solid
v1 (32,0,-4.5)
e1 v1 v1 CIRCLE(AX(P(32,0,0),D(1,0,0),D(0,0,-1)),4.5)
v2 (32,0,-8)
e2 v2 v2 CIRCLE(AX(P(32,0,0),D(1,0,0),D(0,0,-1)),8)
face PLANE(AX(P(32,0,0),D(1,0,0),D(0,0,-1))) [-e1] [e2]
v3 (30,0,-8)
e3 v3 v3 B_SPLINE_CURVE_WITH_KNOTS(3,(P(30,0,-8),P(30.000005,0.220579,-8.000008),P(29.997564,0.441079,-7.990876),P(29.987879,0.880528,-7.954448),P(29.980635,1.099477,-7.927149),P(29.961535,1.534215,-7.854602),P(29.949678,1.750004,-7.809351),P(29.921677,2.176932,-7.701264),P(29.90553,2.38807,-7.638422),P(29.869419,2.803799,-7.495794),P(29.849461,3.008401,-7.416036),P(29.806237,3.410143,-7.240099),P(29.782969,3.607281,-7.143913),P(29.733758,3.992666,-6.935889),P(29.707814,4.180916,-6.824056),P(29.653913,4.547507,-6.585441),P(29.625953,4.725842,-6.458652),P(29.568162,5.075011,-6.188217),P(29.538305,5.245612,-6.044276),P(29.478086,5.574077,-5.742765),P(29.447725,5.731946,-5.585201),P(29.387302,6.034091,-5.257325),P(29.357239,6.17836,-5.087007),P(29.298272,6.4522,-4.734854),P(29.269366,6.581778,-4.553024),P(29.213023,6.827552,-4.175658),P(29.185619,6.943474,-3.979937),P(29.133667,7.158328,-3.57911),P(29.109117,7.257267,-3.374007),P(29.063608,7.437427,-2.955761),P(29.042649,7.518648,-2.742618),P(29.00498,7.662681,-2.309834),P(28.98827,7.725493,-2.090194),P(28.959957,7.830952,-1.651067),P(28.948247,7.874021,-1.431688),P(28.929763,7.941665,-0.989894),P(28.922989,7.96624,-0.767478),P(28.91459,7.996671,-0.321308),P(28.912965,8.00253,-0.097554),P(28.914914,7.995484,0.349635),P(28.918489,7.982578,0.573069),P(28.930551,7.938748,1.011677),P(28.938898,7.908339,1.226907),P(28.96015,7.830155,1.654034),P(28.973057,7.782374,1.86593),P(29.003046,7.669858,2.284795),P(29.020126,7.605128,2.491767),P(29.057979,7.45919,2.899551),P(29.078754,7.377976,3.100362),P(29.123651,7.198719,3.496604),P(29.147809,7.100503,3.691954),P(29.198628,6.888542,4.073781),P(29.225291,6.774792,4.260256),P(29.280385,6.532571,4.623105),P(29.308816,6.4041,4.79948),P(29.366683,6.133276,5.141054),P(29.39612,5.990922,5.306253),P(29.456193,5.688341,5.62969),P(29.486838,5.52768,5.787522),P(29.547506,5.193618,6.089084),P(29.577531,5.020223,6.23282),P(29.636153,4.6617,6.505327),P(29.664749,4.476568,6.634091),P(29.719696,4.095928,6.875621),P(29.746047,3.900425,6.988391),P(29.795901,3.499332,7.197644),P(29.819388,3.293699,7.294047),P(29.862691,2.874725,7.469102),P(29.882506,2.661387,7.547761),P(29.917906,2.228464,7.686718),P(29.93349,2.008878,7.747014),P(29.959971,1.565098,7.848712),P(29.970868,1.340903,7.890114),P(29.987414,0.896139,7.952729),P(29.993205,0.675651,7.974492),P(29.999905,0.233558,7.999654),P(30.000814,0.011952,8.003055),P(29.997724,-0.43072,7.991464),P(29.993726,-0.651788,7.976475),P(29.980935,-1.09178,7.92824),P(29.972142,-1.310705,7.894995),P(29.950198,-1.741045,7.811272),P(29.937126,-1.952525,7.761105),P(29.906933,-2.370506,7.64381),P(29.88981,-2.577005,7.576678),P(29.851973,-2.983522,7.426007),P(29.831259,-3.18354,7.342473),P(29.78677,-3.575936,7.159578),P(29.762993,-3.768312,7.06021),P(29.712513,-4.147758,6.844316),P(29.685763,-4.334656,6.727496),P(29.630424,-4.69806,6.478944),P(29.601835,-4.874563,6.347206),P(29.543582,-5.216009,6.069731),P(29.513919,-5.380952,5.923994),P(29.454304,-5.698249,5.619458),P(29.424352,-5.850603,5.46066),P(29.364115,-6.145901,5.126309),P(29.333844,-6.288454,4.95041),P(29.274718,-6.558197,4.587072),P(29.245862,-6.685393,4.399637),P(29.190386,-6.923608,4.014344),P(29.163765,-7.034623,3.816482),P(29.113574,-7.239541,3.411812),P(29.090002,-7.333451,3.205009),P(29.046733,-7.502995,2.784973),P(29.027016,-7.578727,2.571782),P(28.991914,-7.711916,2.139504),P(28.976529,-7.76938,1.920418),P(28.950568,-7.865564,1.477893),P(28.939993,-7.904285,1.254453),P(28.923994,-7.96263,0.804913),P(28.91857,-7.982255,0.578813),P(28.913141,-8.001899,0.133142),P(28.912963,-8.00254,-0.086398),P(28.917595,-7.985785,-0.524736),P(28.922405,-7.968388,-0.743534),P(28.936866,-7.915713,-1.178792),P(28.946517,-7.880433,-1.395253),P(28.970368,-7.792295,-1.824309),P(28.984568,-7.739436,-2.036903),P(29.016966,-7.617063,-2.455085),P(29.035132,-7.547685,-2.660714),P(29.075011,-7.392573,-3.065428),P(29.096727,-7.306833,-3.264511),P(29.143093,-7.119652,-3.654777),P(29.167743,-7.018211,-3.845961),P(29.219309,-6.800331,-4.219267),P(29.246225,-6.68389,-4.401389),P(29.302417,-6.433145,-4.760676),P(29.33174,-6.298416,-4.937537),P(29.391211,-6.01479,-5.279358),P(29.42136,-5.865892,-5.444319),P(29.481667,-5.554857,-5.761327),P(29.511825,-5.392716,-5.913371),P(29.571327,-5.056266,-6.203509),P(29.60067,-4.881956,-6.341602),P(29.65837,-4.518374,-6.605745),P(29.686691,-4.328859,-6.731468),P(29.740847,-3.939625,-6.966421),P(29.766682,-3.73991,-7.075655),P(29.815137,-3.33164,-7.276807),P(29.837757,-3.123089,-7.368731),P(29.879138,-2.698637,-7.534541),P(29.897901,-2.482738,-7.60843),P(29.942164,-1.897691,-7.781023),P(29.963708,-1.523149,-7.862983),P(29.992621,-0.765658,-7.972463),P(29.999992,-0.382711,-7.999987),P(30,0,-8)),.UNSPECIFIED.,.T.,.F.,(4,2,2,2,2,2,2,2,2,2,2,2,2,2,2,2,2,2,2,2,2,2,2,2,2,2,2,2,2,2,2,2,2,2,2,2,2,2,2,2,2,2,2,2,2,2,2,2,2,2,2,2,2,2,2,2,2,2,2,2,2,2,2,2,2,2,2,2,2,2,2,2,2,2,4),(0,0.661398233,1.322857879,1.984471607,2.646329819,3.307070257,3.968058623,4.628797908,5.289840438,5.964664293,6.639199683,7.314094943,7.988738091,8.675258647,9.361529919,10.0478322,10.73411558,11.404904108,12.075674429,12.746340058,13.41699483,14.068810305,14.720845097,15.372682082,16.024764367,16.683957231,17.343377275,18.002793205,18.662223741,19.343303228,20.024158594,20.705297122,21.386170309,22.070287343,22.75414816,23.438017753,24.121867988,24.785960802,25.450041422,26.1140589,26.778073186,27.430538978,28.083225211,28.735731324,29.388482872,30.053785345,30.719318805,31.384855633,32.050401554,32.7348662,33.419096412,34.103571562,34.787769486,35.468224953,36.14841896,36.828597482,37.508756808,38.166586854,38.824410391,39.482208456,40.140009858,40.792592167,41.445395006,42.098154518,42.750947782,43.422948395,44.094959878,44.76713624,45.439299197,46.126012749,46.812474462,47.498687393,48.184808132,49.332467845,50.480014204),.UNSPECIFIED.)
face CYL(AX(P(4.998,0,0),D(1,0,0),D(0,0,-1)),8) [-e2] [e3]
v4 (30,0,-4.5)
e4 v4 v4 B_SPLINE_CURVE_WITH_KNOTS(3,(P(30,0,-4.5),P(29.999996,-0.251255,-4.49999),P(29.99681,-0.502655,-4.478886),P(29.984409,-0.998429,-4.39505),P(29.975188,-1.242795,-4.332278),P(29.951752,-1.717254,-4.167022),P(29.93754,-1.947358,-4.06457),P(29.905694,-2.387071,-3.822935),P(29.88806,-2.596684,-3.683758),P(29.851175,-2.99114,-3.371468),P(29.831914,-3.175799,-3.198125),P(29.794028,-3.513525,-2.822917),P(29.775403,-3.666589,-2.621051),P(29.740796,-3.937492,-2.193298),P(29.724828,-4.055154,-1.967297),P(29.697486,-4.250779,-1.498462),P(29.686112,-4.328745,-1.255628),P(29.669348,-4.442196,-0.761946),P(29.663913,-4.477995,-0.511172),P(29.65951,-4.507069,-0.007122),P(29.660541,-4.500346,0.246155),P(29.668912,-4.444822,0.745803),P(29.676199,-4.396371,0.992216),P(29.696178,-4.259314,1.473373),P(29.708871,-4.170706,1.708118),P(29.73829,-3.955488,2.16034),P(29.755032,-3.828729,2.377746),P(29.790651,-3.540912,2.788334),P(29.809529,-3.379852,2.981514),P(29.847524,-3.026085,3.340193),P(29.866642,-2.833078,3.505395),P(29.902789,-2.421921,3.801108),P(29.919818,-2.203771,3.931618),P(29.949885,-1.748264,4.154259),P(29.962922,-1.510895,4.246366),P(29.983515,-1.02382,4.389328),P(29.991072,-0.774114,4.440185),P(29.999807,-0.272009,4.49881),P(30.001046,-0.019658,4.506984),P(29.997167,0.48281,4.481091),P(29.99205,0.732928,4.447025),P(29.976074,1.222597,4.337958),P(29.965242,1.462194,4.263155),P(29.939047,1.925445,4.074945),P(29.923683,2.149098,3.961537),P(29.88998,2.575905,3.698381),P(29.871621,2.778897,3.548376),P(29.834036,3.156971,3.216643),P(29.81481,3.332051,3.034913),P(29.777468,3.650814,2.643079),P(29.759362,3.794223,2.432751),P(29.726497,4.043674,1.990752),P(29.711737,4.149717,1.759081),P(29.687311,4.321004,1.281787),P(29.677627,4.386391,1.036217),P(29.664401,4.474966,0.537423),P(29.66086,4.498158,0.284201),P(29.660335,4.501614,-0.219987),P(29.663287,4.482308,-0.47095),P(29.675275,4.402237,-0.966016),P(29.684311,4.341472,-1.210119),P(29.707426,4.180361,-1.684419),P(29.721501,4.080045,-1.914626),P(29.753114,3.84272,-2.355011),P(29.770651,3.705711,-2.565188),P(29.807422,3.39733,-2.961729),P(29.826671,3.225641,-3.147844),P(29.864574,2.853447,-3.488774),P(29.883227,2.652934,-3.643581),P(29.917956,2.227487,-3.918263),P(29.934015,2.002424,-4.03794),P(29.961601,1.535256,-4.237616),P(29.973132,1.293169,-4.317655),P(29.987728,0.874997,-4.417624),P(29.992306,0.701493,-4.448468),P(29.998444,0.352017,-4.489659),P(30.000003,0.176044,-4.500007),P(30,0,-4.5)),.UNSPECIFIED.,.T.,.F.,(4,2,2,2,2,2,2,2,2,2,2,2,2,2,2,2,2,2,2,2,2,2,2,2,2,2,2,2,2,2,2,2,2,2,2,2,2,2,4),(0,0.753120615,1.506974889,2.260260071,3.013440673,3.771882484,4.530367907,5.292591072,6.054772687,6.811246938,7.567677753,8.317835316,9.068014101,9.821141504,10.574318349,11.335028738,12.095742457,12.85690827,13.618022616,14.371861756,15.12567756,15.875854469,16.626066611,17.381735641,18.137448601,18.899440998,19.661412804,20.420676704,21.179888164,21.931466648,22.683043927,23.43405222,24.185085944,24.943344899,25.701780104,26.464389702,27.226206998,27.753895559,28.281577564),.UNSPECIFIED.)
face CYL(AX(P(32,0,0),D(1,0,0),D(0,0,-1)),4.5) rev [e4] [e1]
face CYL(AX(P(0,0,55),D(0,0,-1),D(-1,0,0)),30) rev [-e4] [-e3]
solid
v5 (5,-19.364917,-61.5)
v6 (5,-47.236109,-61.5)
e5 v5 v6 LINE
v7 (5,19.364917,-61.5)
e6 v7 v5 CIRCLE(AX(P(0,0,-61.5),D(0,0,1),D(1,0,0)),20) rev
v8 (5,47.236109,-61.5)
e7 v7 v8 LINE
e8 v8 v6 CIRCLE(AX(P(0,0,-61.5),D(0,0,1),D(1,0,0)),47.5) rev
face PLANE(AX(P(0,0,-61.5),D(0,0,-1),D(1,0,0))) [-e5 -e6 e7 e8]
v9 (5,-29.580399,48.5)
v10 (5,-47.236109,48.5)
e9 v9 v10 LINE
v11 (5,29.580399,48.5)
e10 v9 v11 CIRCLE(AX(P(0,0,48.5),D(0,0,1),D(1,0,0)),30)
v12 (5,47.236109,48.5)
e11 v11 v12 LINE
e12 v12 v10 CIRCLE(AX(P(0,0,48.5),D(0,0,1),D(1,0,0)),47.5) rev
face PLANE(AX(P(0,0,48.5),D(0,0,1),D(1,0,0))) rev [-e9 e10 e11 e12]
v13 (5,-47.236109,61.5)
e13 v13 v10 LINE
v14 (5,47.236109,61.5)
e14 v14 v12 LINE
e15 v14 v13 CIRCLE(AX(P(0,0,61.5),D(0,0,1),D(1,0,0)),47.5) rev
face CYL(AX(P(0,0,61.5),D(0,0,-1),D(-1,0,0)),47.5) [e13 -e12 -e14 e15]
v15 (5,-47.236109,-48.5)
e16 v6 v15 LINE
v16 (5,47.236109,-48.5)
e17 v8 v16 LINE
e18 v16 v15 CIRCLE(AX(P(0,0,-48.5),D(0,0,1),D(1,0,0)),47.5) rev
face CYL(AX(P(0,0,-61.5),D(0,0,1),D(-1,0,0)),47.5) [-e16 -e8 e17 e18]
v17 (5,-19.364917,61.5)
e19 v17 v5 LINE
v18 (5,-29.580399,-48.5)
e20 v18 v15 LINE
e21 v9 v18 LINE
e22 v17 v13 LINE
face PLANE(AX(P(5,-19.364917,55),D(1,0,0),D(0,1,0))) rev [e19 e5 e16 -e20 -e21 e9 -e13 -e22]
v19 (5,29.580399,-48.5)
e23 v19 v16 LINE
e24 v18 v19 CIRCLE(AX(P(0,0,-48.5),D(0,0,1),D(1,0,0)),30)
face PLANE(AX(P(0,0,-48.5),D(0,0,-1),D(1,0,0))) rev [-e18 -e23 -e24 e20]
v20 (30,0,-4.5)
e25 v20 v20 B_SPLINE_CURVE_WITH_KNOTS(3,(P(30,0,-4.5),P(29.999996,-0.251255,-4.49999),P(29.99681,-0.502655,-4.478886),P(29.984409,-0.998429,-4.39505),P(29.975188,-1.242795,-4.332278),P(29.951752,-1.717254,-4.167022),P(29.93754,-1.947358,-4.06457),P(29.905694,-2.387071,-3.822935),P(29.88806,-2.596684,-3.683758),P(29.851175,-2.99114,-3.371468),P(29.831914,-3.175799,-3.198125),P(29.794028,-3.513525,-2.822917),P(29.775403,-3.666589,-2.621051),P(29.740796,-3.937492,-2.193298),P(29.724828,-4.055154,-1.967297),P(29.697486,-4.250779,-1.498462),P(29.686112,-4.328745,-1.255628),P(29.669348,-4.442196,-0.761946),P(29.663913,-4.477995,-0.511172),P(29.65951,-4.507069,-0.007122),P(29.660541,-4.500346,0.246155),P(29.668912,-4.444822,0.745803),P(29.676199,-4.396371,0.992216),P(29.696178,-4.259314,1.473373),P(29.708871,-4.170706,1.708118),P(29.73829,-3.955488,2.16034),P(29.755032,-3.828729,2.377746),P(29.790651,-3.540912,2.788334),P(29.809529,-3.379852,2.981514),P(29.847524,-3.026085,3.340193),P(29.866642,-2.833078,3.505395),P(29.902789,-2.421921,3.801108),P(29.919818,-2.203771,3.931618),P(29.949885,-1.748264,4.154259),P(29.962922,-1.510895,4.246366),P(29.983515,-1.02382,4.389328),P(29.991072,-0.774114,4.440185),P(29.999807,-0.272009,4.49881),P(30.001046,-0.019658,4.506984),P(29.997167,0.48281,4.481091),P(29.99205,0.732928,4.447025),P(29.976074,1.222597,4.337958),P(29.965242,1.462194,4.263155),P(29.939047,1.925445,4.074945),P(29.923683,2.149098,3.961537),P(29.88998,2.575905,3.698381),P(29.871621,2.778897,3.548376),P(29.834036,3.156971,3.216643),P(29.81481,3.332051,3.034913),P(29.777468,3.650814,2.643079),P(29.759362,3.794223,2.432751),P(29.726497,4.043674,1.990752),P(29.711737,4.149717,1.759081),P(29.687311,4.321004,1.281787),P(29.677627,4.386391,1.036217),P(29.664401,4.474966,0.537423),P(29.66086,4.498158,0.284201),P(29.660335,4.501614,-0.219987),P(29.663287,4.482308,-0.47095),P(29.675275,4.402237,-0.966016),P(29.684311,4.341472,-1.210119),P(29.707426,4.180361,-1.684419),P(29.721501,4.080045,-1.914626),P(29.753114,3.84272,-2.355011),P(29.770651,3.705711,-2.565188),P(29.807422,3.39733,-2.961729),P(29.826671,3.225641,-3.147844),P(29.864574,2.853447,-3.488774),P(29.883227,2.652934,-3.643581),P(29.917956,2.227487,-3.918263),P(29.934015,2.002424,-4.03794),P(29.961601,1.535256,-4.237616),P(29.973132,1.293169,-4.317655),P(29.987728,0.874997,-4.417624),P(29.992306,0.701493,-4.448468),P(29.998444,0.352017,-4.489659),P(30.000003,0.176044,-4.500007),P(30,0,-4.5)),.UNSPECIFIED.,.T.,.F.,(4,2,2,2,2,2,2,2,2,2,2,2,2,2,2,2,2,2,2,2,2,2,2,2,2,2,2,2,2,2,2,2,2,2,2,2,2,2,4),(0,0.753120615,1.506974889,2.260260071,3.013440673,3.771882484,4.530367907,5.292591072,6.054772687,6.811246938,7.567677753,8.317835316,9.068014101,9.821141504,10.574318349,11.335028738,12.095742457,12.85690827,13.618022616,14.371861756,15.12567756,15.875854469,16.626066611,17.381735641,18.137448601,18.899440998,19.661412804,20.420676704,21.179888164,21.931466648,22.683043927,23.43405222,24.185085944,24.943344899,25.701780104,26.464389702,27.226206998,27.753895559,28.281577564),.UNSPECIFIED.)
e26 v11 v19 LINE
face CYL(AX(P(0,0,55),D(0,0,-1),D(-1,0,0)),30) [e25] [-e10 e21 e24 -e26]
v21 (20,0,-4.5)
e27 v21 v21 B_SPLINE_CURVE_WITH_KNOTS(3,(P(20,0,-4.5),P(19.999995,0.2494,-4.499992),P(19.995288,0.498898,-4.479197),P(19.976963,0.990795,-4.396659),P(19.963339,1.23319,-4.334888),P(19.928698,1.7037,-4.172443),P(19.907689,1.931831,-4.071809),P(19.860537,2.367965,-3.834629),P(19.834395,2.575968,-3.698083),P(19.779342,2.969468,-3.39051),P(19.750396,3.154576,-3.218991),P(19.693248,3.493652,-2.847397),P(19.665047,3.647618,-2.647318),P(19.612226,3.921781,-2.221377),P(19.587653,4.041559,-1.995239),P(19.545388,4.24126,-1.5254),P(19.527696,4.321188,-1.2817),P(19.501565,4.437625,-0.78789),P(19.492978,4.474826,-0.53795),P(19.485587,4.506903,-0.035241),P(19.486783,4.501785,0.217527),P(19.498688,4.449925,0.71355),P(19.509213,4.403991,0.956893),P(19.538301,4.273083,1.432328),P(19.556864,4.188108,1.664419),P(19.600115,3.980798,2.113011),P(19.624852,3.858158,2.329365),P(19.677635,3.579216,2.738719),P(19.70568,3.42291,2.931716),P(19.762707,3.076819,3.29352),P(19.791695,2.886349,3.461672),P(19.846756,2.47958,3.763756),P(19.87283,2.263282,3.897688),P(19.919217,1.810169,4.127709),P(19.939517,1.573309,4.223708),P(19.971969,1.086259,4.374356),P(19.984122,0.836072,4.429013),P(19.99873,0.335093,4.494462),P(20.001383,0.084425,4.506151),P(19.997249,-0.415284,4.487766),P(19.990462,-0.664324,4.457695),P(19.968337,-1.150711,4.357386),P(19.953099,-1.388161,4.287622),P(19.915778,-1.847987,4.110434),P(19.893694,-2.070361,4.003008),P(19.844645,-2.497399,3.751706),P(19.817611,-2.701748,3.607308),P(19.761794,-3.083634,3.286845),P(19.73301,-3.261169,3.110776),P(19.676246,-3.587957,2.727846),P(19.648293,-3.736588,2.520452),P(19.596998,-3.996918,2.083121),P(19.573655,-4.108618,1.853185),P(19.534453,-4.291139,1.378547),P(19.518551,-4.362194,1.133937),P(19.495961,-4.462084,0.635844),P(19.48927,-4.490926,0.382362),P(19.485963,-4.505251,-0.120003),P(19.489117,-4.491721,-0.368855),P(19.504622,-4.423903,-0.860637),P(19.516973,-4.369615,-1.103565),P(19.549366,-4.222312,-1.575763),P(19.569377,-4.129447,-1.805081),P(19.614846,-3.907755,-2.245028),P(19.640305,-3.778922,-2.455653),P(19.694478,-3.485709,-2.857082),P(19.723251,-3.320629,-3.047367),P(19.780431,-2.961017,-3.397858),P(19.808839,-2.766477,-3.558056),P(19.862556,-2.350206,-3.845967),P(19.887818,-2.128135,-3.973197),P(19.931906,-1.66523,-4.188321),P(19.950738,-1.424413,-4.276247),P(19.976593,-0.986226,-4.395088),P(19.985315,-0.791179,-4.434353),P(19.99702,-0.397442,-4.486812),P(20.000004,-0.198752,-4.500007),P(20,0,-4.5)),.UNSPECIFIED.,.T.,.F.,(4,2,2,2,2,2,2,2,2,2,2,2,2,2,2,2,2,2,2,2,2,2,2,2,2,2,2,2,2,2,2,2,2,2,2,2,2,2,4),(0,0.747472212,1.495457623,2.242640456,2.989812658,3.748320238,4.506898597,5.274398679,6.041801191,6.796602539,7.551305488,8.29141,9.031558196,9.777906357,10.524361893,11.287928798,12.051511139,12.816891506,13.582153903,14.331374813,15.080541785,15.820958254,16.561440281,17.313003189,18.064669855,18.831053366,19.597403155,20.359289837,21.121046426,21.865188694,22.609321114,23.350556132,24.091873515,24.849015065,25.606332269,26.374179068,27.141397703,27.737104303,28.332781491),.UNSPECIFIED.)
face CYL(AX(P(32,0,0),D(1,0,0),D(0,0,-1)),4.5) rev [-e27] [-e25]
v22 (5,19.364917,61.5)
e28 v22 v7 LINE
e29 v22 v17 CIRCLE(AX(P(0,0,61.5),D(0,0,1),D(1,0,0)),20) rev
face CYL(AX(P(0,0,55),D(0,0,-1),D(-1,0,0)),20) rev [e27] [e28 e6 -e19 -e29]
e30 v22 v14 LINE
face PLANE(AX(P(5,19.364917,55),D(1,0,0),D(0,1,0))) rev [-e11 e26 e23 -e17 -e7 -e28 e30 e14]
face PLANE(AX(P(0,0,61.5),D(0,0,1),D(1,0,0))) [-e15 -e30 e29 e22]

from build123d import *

# Parameters (mm, degrees)
BOSS_EXTRUDE2_DEPTH = 55
BOSS_EXTRUDE5_DEPTH = 6.5
HOLE1_START         = 30.000000107
HOLE1_OUTLINE_R     = 8
HOLE1_OUTLINE_R_2   = 4.5
HOLE1_DEPTH         = 1.999999893
HOLE1_START_2       = 28.913664955
HOLE1_2_OUTLINE_R   = 8
HOLE1_2_OUTLINE_R_2 = 4.5
HOLE1_2_DEPTH       = 1.086335152
HOLE1_START_3       = 5
HOLE1_4_OUTLINE_R   = 4.5
HOLE1_4_DEPTH       = 26


with BuildPart() as part:
    # Sketch2 → Boss-Extrude2 (new, symmetric)
    with BuildSketch(Plane.XY):
        with BuildLine():
            Line((5, 19.364916731), (5, 29.580398915))
            ThreePointArc((5, 29.580398915), (30, 0), (5, -29.580398915))
            Line((5, -29.580398915), (5, -19.364916731))
            ThreePointArc((5, -19.364916731), (20, 0), (5, 19.364916731))
        make_face()
    extrude(amount=BOSS_EXTRUDE2_DEPTH, both=True)

    # Sketch4 → Boss-Extrude5 (add, symmetric)
    with BuildSketch(Plane.XY.offset(55)):
        with BuildLine():
            Line((5, 47.236109069), (5, 29.580398915))
            ThreePointArc((5, 29.580398915), (30, 0), (5, -29.580398915))
            Line((5, -29.580398915), (5, -47.236109069))
            ThreePointArc((5, -47.236109069), (47.5, 0), (5, 47.236109069))
        make_face()
        with BuildLine():
            Line((5, 29.580398915), (5, 19.364916731))
            ThreePointArc((5, 19.364916731), (20, 0), (5, -19.364916731))
            Line((5, -19.364916731), (5, -29.580398915))
            ThreePointArc((5, -29.580398915), (30, 0), (5, 29.580398915))
        make_face()
    extrude(amount=BOSS_EXTRUDE5_DEPTH, both=True)

    # Mirror1: part across plane


with BuildPart() as part_1:
    add(part.part)
    add(part.part.mirror(Plane.XY))

    # Hole1 4 outline → Hole1 4 (cut)
    with BuildSketch(Plane.YZ.offset(HOLE1_START_3)):
        Circle(HOLE1_4_OUTLINE_R)
    extrude(amount=HOLE1_4_DEPTH, mode=Mode.SUBTRACT)


with BuildPart() as body_2:
    # Hole1: read off the stored shape, not the designer's step
    # Hole1 outline → Hole1 (new body)
    with BuildSketch(Plane.YZ.offset(HOLE1_START)):
        Circle(HOLE1_OUTLINE_R)
        Circle(HOLE1_OUTLINE_R_2, mode=Mode.SUBTRACT)
    extrude(amount=HOLE1_DEPTH)

    # Hole1 2 outline → Hole1 2 (add)
    with BuildSketch(Plane.YZ.offset(HOLE1_START_2)):
        Circle(HOLE1_2_OUTLINE_R)
        Circle(HOLE1_2_OUTLINE_R_2, mode=Mode.SUBTRACT)
    extrude(amount=HOLE1_2_DEPTH)

    # Hole1 3: loft between two sections, ruled curve by curve
    hole1_3_from = [
        Edge.make_three_point_arc((28.913509771, 8.000559526, 8.000558771), (30, 6.03e-07, 8.000558771), (28.913510093, -8.000558363, 8.000558771)),
        Edge.make_line((28.913510093, -8.000558363, 8.000558771), (28.913509771, 8.000559526, 8.000558771)),
    ]
    hole1_3_to = [
        Edge.make_three_point_arc((28.913509771, 8.000559526, -8.000001872), (30, 6.03e-07, -8.000001872), (28.913510093, -8.000558363, -8.000001872)),
        Edge.make_line((28.913510093, -8.000558363, -8.000001872), (28.913509771, 8.000559526, -8.000001872)),
    ]
    hole1_3 = Solid(Shell([*[Face.make_surface_from_curves(hole1_3_from[k], hole1_3_to[k]) for k in range(2)], Face(Wire(hole1_3_from)), Face(Wire(hole1_3_to))]))
    add(hole1_3, mode=Mode.SUBTRACT)


solid = Compound([part_1.part, body_2.part])
